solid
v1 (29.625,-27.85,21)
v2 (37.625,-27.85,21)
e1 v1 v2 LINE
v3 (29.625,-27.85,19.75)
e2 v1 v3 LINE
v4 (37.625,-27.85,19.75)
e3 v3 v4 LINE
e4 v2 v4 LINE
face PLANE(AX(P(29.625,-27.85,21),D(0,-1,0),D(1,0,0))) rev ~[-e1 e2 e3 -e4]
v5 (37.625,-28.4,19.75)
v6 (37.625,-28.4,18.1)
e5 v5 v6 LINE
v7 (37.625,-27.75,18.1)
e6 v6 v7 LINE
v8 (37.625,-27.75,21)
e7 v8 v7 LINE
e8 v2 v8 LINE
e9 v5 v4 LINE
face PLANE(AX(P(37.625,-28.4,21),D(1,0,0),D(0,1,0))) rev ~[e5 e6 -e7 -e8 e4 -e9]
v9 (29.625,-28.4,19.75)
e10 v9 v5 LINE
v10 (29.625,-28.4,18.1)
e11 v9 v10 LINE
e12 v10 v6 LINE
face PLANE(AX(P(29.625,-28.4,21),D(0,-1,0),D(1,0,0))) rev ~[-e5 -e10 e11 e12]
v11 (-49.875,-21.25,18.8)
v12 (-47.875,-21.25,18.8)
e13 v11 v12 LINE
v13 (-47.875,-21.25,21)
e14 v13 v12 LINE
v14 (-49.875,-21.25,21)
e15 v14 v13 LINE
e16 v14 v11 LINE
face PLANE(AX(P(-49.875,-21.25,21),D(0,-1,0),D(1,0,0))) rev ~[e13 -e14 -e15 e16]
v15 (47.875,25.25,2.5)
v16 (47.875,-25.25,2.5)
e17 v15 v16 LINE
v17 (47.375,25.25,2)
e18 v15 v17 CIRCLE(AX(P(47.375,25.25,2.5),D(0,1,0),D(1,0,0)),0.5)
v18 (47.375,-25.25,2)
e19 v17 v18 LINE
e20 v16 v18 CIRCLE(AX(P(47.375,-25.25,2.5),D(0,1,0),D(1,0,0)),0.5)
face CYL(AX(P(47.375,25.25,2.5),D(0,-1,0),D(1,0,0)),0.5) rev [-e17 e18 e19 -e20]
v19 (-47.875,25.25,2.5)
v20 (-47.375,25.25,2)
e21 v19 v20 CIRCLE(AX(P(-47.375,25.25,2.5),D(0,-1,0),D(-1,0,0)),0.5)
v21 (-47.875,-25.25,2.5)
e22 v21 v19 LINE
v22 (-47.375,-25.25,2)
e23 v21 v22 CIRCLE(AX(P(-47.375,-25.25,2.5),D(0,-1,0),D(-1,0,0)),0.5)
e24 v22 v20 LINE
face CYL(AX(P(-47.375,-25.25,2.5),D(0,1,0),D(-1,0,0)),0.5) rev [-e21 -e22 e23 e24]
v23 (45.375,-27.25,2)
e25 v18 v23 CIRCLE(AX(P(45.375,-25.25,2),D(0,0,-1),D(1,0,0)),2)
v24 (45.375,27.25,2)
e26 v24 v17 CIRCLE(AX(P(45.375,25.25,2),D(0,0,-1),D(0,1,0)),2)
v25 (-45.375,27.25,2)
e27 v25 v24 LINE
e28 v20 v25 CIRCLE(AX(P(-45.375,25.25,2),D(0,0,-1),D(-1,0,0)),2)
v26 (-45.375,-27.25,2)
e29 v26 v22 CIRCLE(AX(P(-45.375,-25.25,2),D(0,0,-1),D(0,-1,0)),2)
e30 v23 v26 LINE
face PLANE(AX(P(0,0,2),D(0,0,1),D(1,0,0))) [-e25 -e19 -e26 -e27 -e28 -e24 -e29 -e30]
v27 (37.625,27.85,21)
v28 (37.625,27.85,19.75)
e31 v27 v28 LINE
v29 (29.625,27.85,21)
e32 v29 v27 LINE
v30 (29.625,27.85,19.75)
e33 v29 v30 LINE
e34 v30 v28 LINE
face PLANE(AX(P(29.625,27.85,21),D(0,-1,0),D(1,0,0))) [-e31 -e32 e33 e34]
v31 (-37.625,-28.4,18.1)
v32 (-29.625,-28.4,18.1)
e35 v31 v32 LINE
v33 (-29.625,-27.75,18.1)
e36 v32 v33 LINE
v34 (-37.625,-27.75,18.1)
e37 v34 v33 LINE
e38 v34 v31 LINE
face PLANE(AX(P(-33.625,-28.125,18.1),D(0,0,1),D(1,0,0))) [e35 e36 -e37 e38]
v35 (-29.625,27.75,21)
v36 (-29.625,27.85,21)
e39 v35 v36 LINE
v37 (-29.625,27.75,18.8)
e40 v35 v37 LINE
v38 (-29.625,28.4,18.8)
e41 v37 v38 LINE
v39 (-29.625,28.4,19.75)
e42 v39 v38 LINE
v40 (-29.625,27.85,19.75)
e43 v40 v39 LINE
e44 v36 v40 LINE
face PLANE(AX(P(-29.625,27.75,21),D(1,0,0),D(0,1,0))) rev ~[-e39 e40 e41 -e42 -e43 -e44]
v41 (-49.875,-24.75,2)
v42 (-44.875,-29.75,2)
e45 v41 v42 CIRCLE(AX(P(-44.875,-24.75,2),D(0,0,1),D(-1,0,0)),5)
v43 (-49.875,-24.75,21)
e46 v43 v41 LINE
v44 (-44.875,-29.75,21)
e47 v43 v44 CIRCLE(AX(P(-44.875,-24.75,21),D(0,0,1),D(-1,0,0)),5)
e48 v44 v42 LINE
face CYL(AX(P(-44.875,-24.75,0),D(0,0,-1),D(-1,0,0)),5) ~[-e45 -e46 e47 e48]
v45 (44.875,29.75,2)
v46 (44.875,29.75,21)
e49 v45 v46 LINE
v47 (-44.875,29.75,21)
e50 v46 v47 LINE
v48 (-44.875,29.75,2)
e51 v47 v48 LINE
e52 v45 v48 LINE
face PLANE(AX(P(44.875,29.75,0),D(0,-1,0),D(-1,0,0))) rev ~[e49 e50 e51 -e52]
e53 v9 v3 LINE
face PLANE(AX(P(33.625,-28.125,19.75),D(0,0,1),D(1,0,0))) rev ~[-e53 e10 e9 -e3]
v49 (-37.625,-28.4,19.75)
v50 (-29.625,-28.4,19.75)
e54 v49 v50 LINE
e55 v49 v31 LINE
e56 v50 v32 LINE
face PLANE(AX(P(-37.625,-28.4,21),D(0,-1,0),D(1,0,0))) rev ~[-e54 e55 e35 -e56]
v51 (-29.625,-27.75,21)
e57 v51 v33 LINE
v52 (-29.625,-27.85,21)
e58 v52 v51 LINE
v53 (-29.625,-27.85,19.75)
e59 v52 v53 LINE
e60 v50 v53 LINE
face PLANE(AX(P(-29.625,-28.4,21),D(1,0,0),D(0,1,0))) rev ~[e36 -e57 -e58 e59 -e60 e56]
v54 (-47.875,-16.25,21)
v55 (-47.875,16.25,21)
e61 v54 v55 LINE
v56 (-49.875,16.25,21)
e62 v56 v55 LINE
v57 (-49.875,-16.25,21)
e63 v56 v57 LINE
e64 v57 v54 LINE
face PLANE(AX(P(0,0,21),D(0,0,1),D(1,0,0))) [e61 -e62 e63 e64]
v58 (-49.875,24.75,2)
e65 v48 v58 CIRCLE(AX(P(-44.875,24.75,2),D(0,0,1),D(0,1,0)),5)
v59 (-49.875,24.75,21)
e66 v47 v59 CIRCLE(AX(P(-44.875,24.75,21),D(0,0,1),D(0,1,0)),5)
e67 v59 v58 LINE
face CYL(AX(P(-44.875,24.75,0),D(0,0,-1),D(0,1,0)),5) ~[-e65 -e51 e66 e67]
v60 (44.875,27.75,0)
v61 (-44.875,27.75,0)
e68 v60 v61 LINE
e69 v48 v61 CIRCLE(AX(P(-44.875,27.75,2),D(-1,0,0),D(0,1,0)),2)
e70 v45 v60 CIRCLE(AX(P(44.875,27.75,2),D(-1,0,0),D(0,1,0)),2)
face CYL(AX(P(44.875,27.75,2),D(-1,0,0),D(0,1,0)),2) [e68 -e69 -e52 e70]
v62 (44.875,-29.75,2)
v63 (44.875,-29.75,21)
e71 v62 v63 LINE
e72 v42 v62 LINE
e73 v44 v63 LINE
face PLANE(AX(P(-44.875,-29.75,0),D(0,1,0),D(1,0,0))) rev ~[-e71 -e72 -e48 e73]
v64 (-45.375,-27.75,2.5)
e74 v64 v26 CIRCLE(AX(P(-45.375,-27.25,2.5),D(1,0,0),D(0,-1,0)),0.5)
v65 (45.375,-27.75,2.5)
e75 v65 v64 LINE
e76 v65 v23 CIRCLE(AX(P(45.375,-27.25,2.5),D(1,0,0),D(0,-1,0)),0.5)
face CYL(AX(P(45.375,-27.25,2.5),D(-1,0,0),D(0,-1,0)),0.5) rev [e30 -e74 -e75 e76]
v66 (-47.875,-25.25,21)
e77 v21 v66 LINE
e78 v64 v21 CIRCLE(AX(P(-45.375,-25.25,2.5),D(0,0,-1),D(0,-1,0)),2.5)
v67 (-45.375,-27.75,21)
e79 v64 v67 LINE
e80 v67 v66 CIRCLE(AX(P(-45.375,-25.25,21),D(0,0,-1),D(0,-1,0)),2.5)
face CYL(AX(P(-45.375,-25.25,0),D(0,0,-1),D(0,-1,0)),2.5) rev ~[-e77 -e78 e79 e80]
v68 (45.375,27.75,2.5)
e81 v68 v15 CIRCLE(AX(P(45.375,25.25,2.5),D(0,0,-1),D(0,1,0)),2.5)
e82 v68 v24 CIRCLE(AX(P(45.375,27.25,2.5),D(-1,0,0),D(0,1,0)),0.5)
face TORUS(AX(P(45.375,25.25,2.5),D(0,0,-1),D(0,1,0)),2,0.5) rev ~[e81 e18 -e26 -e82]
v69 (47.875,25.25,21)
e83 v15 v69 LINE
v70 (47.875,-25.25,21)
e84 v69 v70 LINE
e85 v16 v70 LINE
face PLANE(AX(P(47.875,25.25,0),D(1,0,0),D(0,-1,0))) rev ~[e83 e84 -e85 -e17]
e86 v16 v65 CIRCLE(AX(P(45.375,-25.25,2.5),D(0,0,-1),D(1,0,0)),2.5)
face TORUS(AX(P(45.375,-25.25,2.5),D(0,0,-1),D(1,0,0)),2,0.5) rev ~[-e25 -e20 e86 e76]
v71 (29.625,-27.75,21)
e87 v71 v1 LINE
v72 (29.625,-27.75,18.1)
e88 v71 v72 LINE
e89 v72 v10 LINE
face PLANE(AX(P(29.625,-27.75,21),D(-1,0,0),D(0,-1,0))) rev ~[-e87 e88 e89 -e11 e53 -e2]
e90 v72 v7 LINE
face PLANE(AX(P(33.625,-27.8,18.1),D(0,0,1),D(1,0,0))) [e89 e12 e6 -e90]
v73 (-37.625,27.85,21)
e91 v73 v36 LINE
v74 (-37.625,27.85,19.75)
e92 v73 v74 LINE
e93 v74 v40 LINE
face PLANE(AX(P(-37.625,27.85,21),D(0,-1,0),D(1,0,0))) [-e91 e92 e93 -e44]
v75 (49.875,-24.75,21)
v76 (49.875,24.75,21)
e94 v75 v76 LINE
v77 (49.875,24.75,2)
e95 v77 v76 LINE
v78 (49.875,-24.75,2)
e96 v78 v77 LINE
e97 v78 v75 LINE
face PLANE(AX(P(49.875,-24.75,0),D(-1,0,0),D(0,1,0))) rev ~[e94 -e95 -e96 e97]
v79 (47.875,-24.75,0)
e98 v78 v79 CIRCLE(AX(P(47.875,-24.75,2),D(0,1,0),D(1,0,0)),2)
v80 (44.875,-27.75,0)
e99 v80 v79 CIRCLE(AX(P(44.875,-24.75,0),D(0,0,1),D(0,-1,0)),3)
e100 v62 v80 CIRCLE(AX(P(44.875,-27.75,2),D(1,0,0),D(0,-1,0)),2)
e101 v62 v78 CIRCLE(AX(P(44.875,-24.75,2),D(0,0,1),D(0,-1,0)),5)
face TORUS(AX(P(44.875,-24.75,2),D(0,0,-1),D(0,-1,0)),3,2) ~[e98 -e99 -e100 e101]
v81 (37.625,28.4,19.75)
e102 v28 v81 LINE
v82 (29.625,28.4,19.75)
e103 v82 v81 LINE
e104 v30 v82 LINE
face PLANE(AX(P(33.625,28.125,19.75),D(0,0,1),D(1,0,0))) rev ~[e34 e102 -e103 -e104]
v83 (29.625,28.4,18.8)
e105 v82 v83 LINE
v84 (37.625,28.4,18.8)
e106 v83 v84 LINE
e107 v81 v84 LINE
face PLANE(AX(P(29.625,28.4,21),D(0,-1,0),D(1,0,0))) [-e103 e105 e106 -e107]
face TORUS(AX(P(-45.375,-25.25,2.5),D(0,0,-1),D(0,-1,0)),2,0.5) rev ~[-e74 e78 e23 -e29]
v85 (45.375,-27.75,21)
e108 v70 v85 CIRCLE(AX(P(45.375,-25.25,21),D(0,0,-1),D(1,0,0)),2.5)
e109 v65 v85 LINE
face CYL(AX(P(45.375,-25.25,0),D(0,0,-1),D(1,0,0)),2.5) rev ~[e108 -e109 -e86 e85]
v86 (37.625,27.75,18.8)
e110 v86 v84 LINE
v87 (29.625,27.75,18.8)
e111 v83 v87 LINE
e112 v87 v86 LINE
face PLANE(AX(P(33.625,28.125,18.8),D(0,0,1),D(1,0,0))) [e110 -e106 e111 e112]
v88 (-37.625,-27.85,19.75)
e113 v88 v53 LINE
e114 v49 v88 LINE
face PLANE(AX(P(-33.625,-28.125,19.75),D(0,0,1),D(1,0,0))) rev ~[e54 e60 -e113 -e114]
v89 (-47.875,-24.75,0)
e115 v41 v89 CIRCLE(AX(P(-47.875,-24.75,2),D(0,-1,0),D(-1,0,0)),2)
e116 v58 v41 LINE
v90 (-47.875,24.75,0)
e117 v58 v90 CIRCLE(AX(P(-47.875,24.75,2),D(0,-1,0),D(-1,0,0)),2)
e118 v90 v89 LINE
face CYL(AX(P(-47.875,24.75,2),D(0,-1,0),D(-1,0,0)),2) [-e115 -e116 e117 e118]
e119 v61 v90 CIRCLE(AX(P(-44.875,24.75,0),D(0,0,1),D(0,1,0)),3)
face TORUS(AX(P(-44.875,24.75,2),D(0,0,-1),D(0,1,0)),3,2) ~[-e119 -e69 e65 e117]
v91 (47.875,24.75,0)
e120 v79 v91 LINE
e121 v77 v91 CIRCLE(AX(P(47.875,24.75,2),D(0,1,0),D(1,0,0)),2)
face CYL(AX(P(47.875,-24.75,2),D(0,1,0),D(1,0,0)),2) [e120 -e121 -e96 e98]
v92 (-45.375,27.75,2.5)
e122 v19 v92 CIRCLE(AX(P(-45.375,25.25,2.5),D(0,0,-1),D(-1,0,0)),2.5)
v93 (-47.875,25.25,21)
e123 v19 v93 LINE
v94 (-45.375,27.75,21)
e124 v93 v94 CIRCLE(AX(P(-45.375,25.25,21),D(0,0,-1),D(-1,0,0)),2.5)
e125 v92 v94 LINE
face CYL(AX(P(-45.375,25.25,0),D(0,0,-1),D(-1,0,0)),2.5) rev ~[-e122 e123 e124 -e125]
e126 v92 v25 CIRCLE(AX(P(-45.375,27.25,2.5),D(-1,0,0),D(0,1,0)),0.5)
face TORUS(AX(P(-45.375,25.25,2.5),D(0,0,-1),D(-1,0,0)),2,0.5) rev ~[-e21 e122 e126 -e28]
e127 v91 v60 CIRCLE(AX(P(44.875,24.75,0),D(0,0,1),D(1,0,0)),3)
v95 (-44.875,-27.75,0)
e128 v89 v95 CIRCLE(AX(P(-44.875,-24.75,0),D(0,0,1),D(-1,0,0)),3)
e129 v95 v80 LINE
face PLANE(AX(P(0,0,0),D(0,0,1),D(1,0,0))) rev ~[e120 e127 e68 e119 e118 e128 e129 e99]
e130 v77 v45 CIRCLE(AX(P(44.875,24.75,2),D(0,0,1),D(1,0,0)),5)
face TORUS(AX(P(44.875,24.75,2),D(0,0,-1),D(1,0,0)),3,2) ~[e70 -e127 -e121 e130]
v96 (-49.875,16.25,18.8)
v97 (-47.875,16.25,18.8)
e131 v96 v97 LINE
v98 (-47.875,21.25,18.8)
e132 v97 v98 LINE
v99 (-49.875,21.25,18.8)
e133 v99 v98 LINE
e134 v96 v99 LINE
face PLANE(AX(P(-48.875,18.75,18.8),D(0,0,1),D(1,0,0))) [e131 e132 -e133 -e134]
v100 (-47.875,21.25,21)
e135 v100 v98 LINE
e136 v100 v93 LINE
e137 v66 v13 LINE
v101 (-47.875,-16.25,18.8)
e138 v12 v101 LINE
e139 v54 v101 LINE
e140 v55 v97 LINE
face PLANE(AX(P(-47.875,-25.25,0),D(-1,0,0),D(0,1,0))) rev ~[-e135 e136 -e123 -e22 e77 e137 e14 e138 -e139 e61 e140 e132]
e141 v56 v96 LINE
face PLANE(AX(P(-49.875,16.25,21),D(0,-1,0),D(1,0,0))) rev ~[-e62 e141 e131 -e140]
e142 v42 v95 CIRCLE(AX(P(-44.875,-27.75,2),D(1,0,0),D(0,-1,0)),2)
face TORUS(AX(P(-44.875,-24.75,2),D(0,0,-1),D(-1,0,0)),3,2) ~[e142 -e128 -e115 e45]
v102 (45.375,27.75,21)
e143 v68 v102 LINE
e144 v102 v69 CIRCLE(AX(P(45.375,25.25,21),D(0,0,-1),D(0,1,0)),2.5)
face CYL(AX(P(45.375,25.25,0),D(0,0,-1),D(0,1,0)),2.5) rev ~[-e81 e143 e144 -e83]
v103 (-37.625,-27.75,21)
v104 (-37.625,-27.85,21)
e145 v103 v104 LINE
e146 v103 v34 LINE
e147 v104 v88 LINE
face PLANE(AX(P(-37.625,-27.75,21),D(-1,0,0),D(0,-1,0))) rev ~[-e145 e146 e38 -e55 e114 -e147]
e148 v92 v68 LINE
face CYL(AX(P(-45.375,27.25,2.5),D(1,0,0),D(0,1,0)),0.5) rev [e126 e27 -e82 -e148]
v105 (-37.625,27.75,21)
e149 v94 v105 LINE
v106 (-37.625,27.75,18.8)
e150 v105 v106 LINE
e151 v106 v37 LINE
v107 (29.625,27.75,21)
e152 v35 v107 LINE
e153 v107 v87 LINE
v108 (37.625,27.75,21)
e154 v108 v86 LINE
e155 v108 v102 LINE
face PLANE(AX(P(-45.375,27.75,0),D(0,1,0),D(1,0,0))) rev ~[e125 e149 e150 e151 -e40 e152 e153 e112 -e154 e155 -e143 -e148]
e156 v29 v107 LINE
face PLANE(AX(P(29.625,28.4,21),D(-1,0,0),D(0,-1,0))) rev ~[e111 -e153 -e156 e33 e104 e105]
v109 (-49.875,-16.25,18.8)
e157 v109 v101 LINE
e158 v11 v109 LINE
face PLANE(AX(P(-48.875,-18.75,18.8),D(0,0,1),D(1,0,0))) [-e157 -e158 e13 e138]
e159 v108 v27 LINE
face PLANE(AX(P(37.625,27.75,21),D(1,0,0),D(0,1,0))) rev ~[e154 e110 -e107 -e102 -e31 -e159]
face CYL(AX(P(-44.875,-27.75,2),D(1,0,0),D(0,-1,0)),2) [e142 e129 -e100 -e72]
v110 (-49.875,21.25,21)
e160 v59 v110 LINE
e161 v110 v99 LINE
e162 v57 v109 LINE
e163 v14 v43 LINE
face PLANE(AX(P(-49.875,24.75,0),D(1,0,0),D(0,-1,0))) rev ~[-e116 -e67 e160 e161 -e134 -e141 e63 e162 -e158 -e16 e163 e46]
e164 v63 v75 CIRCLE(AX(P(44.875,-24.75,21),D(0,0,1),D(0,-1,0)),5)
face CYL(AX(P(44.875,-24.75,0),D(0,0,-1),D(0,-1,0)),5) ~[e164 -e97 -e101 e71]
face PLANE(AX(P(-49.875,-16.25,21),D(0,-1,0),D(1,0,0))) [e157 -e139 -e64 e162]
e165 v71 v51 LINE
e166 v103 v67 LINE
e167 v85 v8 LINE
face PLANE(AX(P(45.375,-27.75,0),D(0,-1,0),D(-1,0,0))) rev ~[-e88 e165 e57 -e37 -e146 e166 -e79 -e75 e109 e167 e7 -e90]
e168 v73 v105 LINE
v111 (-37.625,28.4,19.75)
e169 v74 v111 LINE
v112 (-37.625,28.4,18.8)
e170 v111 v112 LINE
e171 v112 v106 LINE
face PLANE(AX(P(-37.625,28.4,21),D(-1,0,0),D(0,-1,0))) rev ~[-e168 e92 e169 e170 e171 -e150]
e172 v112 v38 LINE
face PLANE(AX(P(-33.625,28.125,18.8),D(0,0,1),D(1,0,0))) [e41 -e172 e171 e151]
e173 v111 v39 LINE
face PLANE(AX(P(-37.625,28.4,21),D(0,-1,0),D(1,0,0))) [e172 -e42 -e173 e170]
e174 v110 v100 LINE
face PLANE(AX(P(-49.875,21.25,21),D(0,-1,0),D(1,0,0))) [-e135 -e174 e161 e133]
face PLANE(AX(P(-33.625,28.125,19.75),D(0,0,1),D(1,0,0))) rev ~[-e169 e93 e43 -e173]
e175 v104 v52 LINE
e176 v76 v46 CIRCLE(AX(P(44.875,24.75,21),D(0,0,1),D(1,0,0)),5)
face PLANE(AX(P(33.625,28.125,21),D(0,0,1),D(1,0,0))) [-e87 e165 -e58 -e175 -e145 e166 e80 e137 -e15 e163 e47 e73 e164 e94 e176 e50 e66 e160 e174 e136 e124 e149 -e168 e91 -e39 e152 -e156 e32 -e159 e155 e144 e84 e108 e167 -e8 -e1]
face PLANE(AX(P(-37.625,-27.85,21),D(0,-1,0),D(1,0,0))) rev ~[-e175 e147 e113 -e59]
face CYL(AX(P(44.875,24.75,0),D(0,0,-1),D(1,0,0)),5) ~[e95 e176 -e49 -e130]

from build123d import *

# Parameters (mm, degrees)
F1_DEPTH = 2
F2_DEPTH = 21
F3_R     = 2
F4_W     = 2
F4_H     = 5
F4_W_2   = 8
F4_H_2   = 0.55
F4_H_3   = 0.1
F5_DEPTH = 2.2
F6_R     = 0.5
F7_DEPTH = 2.9
F8_DEPTH = 1.25


with BuildPart() as f1:
    # F0 (on Top) → F1 (new body)
    with BuildSketch(Plane.XY):
        with BuildLine():
            Line((-44.875, -29.75), (44.875, -29.75))
            ThreePointArc((44.875, -29.75), (48.4105339059, -28.2855339059), (49.875, -24.75))
            Line((49.875, -24.75), (49.875, 24.75))
            ThreePointArc((49.875, 24.75), (48.4105339059, 28.2855339059), (44.875, 29.75))
            Line((44.875, 29.75), (-44.875, 29.75))
            ThreePointArc((-44.875, 29.75), (-48.4105339059, 28.2855339059), (-49.875, 24.75))
            Line((-49.875, 24.75), (-49.875, -24.75))
            ThreePointArc((-49.875, -24.75), (-48.4105339059, -28.2855339059), (-44.875, -29.75))
        make_face()
        with BuildLine():
            ThreePointArc((47.875, -25.25), (47.142766953, -27.017766953), (45.375, -27.75))
            Line((45.375, -27.75), (-45.375, -27.75))
            ThreePointArc((-45.375, -27.75), (-47.142766953, -27.017766953), (-47.875, -25.25))
            Line((-47.875, -25.25), (-47.875, 25.25))
            ThreePointArc((-47.875, 25.25), (-47.142766953, 27.017766953), (-45.375, 27.75))
            Line((-45.375, 27.75), (45.375, 27.75))
            ThreePointArc((45.375, 27.75), (47.142766953, 27.017766953), (47.875, 25.25))
            Line((47.875, 25.25), (47.875, -25.25))
        make_face(mode=Mode.SUBTRACT)
        with BuildLine():
            Line((-45.375, -27.75), (45.375, -27.75))
            ThreePointArc((45.375, -27.75), (47.142766953, -27.017766953), (47.875, -25.25))
            Line((47.875, -25.25), (47.875, 25.25))
            ThreePointArc((47.875, 25.25), (47.142766953, 27.017766953), (45.375, 27.75))
            Line((45.375, 27.75), (-45.375, 27.75))
            ThreePointArc((-45.375, 27.75), (-47.142766953, 27.017766953), (-47.875, 25.25))
            Line((-47.875, 25.25), (-47.875, -25.25))
            ThreePointArc((-47.875, -25.25), (-47.142766953, -27.017766953), (-45.375, -27.75))
        make_face()
    extrude(amount=F1_DEPTH)

    # F0 (on Top) → F2 (join)
    with BuildSketch(Plane.XY):
        with BuildLine():
            Line((-44.875, -29.75), (44.875, -29.75))
            ThreePointArc((44.875, -29.75), (48.4105339059, -28.2855339059), (49.875, -24.75))
            Line((49.875, -24.75), (49.875, 24.75))
            ThreePointArc((49.875, 24.75), (48.4105339059, 28.2855339059), (44.875, 29.75))
            Line((44.875, 29.75), (-44.875, 29.75))
            ThreePointArc((-44.875, 29.75), (-48.4105339059, 28.2855339059), (-49.875, 24.75))
            Line((-49.875, 24.75), (-49.875, -24.75))
            ThreePointArc((-49.875, -24.75), (-48.4105339059, -28.2855339059), (-44.875, -29.75))
        make_face()
        with BuildLine():
            ThreePointArc((47.875, -25.25), (47.142766953, -27.017766953), (45.375, -27.75))
            Line((45.375, -27.75), (-45.375, -27.75))
            ThreePointArc((-45.375, -27.75), (-47.142766953, -27.017766953), (-47.875, -25.25))
            Line((-47.875, -25.25), (-47.875, 25.25))
            ThreePointArc((-47.875, 25.25), (-47.142766953, 27.017766953), (-45.375, 27.75))
            Line((-45.375, 27.75), (45.375, 27.75))
            ThreePointArc((45.375, 27.75), (47.142766953, 27.017766953), (47.875, 25.25))
            Line((47.875, 25.25), (47.875, -25.25))
        make_face(mode=Mode.SUBTRACT)
    extrude(amount=F2_DEPTH)

    # F3
    f3_edges = [f1.edges().sort_by_distance(p)[0] for p in [
        (0, -29.75, 0),
        (-48.410534, -28.285534, 0),
        (-49.875, 0, 0),
        (-48.410534, 28.285534, 0),
        (0, 29.75, 0),
        (48.410534, 28.285534, 0),
        (49.875, 0, 0),
        (48.410534, -28.285534, 0),
    ]]
    fillet(f3_edges, radius=F3_R)

    # F4 (on face) → F5 (cut)
    with BuildSketch(Plane.XY.offset(21)):
        with Locations((-48.875, -18.75)):
            Rectangle(F4_W, F4_H)
        with Locations((-48.875, 18.75)):
            Rectangle(F4_W, F4_H)
        with Locations((-33.625, 28.125)):
            Rectangle(F4_W_2, F4_H_2)
        with Locations((-33.625, 27.8)):
            Rectangle(F4_W_2, F4_H_3)
        with Locations((33.625, 28.125)):
            Rectangle(F4_W_2, F4_H_2)
        with Locations((33.625, 27.8)):
            Rectangle(F4_W_2, F4_H_3)
    extrude(amount=-F5_DEPTH, mode=Mode.SUBTRACT)

    # F6
    f6_edges = [f1.edges().sort_by_distance(p)[0] for p in [
        (47.142767, 27.017767, 2),
        (47.875, 0, 2),
        (47.142767, -27.017767, 2),
        (0, -27.75, 2),
        (-47.142767, -27.017767, 2),
        (-47.875, 0, 2),
        (-47.142767, 27.017767, 2),
        (0, 27.75, 2),
    ]]
    fillet(f6_edges, radius=F6_R)

    # F4 (on face) → F7 (cut)
    with BuildSketch(Plane.XY.offset(21)):
        with Locations((-33.625, -28.125)):
            Rectangle(F4_W_2, F4_H_2)
        with Locations((-33.625, -27.8)):
            Rectangle(F4_W_2, F4_H_3)
        with Locations((33.625, -27.8)):
            Rectangle(F4_W_2, F4_H_3)
        with Locations((33.625, -28.125)):
            Rectangle(F4_W_2, F4_H_2)
    extrude(amount=-F7_DEPTH, mode=Mode.SUBTRACT)

    # F4 (on face) → F8 (join)
    with BuildSketch(Plane.XY.offset(21)):
        with Locations((33.625, 28.125)):
            Rectangle(F4_W_2, F4_H_2)
        with Locations((-33.625, 28.125)):
            Rectangle(F4_W_2, F4_H_2)
        with Locations((-33.625, -28.125)):
            Rectangle(F4_W_2, F4_H_2)
        with Locations((33.625, -28.125)):
            Rectangle(F4_W_2, F4_H_2)
    extrude(amount=-F8_DEPTH)


solid = f1.part
